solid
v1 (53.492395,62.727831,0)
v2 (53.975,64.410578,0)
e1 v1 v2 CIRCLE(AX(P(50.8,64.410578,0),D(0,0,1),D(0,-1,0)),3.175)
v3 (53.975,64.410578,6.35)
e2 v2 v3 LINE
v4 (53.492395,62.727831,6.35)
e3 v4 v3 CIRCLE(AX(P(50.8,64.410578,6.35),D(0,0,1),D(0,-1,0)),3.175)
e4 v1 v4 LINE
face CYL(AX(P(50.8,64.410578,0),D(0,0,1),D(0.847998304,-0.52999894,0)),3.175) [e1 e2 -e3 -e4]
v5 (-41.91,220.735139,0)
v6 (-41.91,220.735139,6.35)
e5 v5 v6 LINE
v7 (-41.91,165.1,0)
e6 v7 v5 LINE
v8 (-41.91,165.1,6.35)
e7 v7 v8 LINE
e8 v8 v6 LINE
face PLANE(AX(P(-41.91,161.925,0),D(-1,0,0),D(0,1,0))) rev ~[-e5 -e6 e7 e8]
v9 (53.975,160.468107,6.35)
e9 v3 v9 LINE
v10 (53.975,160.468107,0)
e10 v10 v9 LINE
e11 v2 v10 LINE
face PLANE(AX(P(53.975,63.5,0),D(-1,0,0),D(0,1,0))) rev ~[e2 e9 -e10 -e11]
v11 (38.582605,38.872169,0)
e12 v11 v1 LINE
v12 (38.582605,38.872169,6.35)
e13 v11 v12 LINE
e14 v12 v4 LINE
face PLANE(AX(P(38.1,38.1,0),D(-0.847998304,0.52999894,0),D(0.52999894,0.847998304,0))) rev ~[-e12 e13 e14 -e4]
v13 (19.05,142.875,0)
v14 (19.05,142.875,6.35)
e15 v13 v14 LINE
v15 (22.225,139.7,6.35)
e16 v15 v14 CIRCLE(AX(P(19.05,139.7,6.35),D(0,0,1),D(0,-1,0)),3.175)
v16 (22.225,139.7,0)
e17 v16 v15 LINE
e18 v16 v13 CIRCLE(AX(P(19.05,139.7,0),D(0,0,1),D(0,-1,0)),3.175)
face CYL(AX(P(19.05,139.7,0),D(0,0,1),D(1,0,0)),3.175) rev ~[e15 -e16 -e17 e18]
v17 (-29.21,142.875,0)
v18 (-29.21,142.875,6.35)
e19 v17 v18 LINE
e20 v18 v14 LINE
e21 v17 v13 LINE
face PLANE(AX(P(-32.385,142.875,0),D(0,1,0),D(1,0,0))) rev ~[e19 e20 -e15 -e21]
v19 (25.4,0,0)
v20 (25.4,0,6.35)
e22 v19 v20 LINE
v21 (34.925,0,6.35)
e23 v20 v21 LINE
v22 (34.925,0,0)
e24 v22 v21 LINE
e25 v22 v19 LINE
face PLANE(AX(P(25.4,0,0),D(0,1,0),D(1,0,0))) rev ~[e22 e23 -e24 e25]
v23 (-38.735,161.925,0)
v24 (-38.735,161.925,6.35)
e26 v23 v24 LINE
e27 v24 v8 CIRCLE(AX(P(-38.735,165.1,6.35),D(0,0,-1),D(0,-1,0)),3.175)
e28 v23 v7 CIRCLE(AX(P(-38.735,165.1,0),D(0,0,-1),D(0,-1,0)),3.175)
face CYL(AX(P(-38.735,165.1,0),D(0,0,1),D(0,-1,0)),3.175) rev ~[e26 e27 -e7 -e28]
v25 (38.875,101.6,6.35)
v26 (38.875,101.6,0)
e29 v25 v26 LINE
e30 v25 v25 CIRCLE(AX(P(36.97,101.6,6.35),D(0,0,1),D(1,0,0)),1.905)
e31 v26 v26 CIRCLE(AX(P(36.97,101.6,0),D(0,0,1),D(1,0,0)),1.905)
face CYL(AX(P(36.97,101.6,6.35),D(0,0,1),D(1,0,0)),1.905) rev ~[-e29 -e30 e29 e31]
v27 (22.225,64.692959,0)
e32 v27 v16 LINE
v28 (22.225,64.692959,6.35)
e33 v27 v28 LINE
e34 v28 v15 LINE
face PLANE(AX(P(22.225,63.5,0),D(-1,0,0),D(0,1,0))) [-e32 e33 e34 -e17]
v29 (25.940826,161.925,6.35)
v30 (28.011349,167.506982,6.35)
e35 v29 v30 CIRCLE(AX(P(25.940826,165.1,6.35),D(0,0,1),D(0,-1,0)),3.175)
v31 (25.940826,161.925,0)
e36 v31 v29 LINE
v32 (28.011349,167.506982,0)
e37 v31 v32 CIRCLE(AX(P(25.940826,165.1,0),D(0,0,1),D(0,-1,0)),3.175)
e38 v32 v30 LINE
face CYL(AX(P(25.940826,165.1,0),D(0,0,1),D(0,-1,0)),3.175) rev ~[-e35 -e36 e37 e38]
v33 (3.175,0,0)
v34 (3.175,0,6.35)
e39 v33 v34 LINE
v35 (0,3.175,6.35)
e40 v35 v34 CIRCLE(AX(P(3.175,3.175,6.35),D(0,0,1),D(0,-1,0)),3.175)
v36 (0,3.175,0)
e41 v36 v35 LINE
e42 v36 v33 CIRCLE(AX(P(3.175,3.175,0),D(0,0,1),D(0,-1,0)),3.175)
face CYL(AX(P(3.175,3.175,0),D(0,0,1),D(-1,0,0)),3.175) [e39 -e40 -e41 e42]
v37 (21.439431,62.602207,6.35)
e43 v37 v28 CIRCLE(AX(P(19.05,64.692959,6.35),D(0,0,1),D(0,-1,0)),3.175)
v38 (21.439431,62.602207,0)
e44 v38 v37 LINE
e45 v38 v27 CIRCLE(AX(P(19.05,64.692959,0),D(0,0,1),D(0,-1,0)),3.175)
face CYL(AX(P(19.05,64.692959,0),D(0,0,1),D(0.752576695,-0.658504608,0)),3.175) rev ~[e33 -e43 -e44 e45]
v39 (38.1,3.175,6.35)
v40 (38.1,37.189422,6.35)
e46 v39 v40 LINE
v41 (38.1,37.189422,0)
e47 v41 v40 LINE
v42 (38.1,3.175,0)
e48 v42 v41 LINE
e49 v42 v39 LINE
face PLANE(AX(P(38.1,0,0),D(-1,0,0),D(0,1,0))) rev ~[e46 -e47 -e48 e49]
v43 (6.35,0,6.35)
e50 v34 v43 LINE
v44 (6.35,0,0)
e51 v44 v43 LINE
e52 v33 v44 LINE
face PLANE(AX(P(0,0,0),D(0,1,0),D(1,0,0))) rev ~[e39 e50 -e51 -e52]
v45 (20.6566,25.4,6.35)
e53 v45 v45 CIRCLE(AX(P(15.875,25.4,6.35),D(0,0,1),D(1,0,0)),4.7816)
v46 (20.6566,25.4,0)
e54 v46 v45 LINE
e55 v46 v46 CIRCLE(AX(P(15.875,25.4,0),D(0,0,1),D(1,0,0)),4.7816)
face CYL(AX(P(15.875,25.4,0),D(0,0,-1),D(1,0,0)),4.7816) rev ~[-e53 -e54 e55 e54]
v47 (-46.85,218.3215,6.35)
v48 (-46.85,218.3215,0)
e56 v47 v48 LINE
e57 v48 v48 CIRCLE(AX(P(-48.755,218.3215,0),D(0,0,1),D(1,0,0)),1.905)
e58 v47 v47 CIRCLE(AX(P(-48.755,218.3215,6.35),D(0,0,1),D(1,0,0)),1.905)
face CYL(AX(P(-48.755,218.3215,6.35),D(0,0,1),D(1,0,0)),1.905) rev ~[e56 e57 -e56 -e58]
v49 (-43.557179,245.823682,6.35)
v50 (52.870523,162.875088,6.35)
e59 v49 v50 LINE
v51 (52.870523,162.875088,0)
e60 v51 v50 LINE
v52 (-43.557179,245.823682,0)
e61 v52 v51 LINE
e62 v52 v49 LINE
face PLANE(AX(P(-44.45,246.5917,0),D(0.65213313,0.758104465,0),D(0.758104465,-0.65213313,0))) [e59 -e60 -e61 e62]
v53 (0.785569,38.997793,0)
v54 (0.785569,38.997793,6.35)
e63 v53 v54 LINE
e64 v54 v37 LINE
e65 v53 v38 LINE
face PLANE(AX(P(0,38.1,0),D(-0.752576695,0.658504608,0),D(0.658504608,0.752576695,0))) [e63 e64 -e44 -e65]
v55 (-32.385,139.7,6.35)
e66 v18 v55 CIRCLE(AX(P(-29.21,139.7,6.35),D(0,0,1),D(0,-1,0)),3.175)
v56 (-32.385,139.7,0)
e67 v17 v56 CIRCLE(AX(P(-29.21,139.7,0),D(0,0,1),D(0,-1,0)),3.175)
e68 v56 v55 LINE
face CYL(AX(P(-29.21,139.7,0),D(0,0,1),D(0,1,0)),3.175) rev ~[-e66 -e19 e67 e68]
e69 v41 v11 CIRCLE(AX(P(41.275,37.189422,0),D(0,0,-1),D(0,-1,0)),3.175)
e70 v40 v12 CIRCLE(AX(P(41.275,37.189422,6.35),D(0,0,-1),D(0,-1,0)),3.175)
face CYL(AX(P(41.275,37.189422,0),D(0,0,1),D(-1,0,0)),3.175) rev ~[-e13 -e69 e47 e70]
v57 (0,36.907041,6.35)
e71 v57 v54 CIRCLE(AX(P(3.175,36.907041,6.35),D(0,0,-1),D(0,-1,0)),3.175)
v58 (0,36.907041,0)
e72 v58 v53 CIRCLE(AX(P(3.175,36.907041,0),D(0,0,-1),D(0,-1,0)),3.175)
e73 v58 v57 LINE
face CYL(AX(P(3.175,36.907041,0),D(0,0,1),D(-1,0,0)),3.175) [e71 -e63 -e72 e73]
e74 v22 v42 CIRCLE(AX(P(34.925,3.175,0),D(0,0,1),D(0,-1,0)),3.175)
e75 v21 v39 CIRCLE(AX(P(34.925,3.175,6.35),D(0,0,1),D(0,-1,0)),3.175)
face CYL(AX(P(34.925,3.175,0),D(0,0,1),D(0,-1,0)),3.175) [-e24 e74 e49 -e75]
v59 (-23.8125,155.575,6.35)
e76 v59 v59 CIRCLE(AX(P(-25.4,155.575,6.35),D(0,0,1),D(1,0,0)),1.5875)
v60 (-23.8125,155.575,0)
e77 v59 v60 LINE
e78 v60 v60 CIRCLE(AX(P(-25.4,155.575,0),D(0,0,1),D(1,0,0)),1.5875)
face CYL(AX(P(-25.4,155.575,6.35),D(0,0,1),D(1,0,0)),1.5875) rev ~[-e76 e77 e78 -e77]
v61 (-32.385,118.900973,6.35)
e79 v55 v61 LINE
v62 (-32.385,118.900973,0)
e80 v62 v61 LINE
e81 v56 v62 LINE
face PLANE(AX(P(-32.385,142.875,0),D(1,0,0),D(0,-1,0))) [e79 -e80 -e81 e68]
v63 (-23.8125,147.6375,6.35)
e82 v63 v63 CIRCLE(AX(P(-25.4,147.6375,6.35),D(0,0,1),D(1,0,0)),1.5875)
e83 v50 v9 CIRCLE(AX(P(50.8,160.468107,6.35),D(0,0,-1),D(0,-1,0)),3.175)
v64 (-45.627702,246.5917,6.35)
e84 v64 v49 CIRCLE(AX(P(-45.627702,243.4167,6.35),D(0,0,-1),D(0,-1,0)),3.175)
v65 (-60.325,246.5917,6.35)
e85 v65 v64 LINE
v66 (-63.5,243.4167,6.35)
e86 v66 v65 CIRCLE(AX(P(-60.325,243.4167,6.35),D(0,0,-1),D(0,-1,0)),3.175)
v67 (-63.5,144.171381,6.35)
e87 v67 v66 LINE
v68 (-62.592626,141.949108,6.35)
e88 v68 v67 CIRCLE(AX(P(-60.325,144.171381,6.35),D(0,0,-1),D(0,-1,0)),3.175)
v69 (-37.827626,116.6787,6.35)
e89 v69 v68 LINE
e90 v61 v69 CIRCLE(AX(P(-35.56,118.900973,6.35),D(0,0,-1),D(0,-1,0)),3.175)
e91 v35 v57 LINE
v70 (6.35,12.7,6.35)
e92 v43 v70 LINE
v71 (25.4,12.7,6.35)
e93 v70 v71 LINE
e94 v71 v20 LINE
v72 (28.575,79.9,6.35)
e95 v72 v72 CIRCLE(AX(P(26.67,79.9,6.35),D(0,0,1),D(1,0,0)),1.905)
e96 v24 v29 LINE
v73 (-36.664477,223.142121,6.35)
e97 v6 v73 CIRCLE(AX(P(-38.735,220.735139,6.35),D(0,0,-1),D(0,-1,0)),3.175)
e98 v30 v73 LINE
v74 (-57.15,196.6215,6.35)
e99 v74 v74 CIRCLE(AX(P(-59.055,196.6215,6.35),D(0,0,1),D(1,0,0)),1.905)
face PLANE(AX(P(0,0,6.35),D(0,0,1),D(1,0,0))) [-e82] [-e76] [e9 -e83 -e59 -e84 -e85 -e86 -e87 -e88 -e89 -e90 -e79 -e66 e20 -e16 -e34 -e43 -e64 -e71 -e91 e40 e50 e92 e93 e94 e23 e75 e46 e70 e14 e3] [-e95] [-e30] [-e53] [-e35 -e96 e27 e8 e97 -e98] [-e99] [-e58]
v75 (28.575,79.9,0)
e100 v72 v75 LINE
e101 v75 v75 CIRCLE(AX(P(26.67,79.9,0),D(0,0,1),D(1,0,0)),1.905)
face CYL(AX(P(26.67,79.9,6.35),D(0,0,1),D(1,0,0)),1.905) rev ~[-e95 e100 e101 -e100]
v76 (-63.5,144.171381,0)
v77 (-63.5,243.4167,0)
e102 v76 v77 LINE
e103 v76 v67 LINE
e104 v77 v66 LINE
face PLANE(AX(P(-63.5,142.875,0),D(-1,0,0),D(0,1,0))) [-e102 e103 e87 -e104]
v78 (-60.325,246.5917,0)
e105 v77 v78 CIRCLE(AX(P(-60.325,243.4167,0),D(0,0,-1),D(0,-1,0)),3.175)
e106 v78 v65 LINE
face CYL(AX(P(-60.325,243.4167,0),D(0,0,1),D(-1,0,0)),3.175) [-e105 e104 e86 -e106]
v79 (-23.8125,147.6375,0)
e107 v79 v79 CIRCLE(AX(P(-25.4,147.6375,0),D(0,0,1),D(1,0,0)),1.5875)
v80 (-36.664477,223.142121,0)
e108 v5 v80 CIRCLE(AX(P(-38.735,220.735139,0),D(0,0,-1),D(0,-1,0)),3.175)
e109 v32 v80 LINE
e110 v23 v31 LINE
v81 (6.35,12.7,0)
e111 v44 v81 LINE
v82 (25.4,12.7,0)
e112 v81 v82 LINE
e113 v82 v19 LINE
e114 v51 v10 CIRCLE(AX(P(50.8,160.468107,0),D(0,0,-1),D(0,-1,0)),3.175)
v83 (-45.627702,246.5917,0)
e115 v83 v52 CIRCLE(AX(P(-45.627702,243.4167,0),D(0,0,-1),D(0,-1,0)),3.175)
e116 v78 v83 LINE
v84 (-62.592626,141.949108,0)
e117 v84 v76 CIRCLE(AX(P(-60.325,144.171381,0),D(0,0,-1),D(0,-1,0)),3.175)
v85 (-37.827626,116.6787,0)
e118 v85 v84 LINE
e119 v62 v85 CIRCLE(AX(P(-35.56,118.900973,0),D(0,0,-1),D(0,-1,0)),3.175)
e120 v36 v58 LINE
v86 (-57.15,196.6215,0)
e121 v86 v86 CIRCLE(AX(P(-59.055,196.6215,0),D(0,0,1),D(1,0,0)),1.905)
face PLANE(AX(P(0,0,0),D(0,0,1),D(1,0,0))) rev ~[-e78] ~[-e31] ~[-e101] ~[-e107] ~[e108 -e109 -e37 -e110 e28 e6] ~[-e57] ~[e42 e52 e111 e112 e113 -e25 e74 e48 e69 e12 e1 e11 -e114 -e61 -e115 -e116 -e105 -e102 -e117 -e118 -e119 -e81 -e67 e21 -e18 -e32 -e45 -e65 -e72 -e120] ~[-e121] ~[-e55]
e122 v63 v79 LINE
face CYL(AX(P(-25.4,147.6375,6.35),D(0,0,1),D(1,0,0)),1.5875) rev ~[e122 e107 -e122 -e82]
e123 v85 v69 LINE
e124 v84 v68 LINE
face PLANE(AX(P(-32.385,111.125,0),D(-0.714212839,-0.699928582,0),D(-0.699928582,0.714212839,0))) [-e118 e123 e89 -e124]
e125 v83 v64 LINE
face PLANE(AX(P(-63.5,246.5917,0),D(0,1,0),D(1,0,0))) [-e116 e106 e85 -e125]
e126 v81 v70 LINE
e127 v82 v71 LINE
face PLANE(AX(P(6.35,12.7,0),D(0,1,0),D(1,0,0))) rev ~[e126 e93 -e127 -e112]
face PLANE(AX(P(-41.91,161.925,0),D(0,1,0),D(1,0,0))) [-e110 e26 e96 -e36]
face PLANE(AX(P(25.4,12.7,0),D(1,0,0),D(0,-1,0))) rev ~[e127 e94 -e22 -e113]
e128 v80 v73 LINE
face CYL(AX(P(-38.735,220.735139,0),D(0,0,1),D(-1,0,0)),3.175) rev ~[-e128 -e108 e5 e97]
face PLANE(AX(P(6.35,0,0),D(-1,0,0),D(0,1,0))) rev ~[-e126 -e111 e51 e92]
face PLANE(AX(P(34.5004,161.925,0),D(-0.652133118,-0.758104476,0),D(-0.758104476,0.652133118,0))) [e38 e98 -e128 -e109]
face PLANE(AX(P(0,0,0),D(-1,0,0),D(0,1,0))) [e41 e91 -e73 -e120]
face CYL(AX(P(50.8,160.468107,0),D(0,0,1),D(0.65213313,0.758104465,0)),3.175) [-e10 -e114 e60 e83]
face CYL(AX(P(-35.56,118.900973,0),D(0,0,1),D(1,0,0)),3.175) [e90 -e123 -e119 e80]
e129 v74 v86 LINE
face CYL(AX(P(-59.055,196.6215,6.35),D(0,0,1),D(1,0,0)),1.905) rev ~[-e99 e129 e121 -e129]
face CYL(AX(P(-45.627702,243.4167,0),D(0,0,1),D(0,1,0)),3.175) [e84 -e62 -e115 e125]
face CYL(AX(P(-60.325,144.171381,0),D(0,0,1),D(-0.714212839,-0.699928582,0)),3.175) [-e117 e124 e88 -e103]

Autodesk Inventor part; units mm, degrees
ref_plane "YZ Plane" through (0, 0, 0) normal (1, 0, 0) x (0, 1, 0)
sketch "Sketch1" plane through (0, 0, 0) normal (0, 0, 1) x (1, 0, 0)
  line L0 (0, 0) -> (6.35, 0)
  line L1 (6.35, 0) -> (6.35, 12.7)
  line L2 (6.35, 12.7) -> (25.4, 12.7)
  line L3 (25.4, 12.7) -> (25.4, 0)
  line L4 (25.4, 0) -> (31.75, 0)
  circle A0 centre (15.875, 25.4) radius 4.7816
  line L5 (-32.385, 142.875) -> (-32.385, 111.125)
  line L6 (-32.385, 142.875) -> (22.225, 142.875)
  line L7 (38.1, 38.1) -> (0, 38.1) construction
  line L8 (53.975, 0) -> (53.975, 161.925) construction
  line L9 (0, 38.1) -> (22.225, 63.5)
  line L10 (53.975, 63.5) -> (53.975, 161.925)
  line L11 (0, 0) -> (0, 38.1)
  line L12 (31.75, 0) -> (38.1, 0)
  line L13 (38.1, 0) -> (38.1, 38.1)
  line L14 (38.1, 38.1) -> (53.975, 63.5)
  line L15 (53.975, 63.5) -> (53.975, 161.925)
  line L16 (22.225, 63.5) -> (22.225, 142.875)
  line L17 (-32.385, 142.875) -> (22.225, 142.875)
  line L18 (0, 0) -> (0, 38.1)
  line L19 (0, 38.1) -> (22.225, 63.5)
  line L20 (22.225, 63.5) -> (22.225, 142.875)
  line L21 (22.225, 142.875) -> (-32.385, 142.875)
  line L22 (-32.385, 142.875) -> (-32.385, 111.125)
  line L23 (6.35, 12.7) -> (25.4, 12.7)
  line L24 (25.4, 12.7) -> (25.4, 0)
  line L25 (38.1, 0) -> (25.4, 0)
  line L26 (38.1, 0) -> (38.1, 38.1)
  line L27 (53.975, 63.5) -> (38.1, 38.1)
  line L28 (53.975, 63.5) -> (53.975, 161.925)
  line L29 (38.1, 0) -> (25.4, 0)
  line L30 (-63.5, 0) -> (-63.5, 246.5917) construction
  line L31 (-63.5, 142.875) -> (-63.5, 246.5917)
  line L32 (-63.5, 246.5917) -> (-44.45, 246.5917)
  line L33 (-32.385, 111.125) -> (-63.5, 142.875)
  line L34 (-44.45, 246.5917) -> (53.975, 161.925)
  line L35 (-41.91, 161.925) -> (34.5004, 161.925)
  line L36 (34.5004, 161.925) -> (-41.91, 227.6544)
  line L37 (-41.91, 161.925) -> (-41.91, 227.6544)
  dimension "d0" = 6.35
  dimension "d1" = 12.7
  dimension "d2" = 19.05
  dimension "d3" = 6.35
  dimension "d5" = 9.5631
  dimension "d6" = 12.7
  dimension "d7" = 9.525
  dimension "d11" = 31.75
  dimension "d23" = 25.4
  dimension "d24" = 38.1
  dimension "d25" = 25.4
  dimension "d26" = 38.1
  dimension "d27" = 54.61
  dimension "d32" = 6.35
  dimension "d33" = 22.225
  dimension "d34" = 38.1
  dimension "d36" = 79.375
  dimension "d60" = 117.475
  dimension "d61" = 103.7167
  dimension "d62" = 19.05
  dimension "d64" = 31.75
  dimension "d66" = 31.115
  dimension "d88" = 12.7
  dimension "d89" = 40.703
  dimension "d91" = 21.59
  dimension "d92" = 19.05
ref_plane "Work Plane1" through (0, 0, 9.525) normal (0, 0, 1) x (1, 0, 0)
ref_plane "Work Plane2" through (0, 0, 9.525) normal (0, 0, 1) x (1, 0, 0)
extrude "Extrusion6" add sketch "Sketch1" along normal blind 6.35
sketch "Sketch5" plane through (0, 0, 6.35) normal (0, 0, 1) x (1, 0, 0)
  line L0 (-44.45, 246.5917) -> (-63.5, 246.5917) projected
  line L1 (-63.5, 246.5917) -> (-63.5, 142.875) projected
  circle A0 centre (-48.755, 218.3215) radius 1.905
  circle A1 centre (-59.055, 196.6215) radius 1.905
  line L2 (-32.385, 142.875) -> (22.225, 142.875) projected
  line L3 (22.225, 142.875) -> (22.225, 63.5) projected
  circle A2 centre (36.97, 101.6) radius 1.905
  circle A3 centre (26.67, 79.9) radius 1.905
  dimension "d95" = 3.81
  dimension "d96" = 3.81
  dimension "d97" = 28.2702
  dimension "d99" = 4.445
  dimension "d123" = 10.3
  dimension "d124" = 21.7
  dimension "d125" = 3.81
  dimension "d126" = 3.81
  dimension "d127" = 10.3
  dimension "d128" = 21.7
  dimension "d129" = 41.275
  dimension "d130" = 4.445
extrude "Extrusion7" cut sketch "Sketch5" against normal blind 9.525
fillet "Fillet3" radius 3.175 16 edges at (-44.45, 246.5917, 3.175) (-63.5, 246.5917, 3.175) (53.975, 161.925, 3.175) (-41.91, 161.925, 3.175) (53.975, 63.5, 3.175) (38.1, 38.1, 3.175) (38.1, 0, 3.175) (0, 0, 3.175) (0, 38.1, 3.175) (22.225, 63.5, 3.175) (22.225, 142.875, 3.175) (-32.385, 111.125, 3.175) (-63.5, 142.875, 3.175) (-32.385, 142.875, 3.175) (-41.91, 227.6544, 3.175) (34.5004, 161.925, 3.175)
sketch "Sketch6" plane through (0, 0, 6.35) normal (0, 0, 1) x (1, 0, 0)
  line L0 (-29.21, 142.875) -> (19.05, 142.875) projected
  line L1 (25.9409, 161.925) -> (-38.735, 161.925) projected
  circle A0 centre (-25.4, 155.575) radius 1.5875
  circle A1 centre (-25.4, 147.6375) radius 1.5875
  line L2 (-63.5, 243.4167) -> (-63.5, 144.1714) projected
  point P0 (0, 0)
  dimension "d104" = 3.175
  dimension "d105" = 3.175
  dimension "d106" = 4.7625
  dimension "d107" = 6.35
  dimension "d110" = 38.1
  dimension "d111" = 38.1
extrude "Extrusion8" cut sketch "Sketch6" against normal blind 9.525
sketch "Sketch7" plane through (0, 0, 6.35) normal (0, 0, 1) x (1, 0, 0)
  line L0 (-29.21, 142.875) -> (19.05, 142.875) projected
  line L1 (22.225, 139.7) -> (22.225, 64.693) projected
  line L2 (53.975, 104.775) -> (-210.9086, 104.775) construction
  circle A0 centre (38.354, 101.6) radius 1.905
  circle A1 centre (28.2448, 78.5876) radius 1.905
  line L3 (53.975, 64.4106) -> (53.975, 160.4681) projected
  point P0 (0, 0)
  dimension "d112" = 38.1
  dimension "d113" = 3.81
  dimension "d114" = 3.81
  dimension "d115" = 23.0124
  dimension "d116" = 10.1092
  dimension "d117" = 6.0198
  dimension "d118" = 3.175
  dimension "d121" = 264.8836
extrude "Extrusion9" [suppressed]
properties part number "Rebuild Right Climber Hook" material "Aluminum 6061"
